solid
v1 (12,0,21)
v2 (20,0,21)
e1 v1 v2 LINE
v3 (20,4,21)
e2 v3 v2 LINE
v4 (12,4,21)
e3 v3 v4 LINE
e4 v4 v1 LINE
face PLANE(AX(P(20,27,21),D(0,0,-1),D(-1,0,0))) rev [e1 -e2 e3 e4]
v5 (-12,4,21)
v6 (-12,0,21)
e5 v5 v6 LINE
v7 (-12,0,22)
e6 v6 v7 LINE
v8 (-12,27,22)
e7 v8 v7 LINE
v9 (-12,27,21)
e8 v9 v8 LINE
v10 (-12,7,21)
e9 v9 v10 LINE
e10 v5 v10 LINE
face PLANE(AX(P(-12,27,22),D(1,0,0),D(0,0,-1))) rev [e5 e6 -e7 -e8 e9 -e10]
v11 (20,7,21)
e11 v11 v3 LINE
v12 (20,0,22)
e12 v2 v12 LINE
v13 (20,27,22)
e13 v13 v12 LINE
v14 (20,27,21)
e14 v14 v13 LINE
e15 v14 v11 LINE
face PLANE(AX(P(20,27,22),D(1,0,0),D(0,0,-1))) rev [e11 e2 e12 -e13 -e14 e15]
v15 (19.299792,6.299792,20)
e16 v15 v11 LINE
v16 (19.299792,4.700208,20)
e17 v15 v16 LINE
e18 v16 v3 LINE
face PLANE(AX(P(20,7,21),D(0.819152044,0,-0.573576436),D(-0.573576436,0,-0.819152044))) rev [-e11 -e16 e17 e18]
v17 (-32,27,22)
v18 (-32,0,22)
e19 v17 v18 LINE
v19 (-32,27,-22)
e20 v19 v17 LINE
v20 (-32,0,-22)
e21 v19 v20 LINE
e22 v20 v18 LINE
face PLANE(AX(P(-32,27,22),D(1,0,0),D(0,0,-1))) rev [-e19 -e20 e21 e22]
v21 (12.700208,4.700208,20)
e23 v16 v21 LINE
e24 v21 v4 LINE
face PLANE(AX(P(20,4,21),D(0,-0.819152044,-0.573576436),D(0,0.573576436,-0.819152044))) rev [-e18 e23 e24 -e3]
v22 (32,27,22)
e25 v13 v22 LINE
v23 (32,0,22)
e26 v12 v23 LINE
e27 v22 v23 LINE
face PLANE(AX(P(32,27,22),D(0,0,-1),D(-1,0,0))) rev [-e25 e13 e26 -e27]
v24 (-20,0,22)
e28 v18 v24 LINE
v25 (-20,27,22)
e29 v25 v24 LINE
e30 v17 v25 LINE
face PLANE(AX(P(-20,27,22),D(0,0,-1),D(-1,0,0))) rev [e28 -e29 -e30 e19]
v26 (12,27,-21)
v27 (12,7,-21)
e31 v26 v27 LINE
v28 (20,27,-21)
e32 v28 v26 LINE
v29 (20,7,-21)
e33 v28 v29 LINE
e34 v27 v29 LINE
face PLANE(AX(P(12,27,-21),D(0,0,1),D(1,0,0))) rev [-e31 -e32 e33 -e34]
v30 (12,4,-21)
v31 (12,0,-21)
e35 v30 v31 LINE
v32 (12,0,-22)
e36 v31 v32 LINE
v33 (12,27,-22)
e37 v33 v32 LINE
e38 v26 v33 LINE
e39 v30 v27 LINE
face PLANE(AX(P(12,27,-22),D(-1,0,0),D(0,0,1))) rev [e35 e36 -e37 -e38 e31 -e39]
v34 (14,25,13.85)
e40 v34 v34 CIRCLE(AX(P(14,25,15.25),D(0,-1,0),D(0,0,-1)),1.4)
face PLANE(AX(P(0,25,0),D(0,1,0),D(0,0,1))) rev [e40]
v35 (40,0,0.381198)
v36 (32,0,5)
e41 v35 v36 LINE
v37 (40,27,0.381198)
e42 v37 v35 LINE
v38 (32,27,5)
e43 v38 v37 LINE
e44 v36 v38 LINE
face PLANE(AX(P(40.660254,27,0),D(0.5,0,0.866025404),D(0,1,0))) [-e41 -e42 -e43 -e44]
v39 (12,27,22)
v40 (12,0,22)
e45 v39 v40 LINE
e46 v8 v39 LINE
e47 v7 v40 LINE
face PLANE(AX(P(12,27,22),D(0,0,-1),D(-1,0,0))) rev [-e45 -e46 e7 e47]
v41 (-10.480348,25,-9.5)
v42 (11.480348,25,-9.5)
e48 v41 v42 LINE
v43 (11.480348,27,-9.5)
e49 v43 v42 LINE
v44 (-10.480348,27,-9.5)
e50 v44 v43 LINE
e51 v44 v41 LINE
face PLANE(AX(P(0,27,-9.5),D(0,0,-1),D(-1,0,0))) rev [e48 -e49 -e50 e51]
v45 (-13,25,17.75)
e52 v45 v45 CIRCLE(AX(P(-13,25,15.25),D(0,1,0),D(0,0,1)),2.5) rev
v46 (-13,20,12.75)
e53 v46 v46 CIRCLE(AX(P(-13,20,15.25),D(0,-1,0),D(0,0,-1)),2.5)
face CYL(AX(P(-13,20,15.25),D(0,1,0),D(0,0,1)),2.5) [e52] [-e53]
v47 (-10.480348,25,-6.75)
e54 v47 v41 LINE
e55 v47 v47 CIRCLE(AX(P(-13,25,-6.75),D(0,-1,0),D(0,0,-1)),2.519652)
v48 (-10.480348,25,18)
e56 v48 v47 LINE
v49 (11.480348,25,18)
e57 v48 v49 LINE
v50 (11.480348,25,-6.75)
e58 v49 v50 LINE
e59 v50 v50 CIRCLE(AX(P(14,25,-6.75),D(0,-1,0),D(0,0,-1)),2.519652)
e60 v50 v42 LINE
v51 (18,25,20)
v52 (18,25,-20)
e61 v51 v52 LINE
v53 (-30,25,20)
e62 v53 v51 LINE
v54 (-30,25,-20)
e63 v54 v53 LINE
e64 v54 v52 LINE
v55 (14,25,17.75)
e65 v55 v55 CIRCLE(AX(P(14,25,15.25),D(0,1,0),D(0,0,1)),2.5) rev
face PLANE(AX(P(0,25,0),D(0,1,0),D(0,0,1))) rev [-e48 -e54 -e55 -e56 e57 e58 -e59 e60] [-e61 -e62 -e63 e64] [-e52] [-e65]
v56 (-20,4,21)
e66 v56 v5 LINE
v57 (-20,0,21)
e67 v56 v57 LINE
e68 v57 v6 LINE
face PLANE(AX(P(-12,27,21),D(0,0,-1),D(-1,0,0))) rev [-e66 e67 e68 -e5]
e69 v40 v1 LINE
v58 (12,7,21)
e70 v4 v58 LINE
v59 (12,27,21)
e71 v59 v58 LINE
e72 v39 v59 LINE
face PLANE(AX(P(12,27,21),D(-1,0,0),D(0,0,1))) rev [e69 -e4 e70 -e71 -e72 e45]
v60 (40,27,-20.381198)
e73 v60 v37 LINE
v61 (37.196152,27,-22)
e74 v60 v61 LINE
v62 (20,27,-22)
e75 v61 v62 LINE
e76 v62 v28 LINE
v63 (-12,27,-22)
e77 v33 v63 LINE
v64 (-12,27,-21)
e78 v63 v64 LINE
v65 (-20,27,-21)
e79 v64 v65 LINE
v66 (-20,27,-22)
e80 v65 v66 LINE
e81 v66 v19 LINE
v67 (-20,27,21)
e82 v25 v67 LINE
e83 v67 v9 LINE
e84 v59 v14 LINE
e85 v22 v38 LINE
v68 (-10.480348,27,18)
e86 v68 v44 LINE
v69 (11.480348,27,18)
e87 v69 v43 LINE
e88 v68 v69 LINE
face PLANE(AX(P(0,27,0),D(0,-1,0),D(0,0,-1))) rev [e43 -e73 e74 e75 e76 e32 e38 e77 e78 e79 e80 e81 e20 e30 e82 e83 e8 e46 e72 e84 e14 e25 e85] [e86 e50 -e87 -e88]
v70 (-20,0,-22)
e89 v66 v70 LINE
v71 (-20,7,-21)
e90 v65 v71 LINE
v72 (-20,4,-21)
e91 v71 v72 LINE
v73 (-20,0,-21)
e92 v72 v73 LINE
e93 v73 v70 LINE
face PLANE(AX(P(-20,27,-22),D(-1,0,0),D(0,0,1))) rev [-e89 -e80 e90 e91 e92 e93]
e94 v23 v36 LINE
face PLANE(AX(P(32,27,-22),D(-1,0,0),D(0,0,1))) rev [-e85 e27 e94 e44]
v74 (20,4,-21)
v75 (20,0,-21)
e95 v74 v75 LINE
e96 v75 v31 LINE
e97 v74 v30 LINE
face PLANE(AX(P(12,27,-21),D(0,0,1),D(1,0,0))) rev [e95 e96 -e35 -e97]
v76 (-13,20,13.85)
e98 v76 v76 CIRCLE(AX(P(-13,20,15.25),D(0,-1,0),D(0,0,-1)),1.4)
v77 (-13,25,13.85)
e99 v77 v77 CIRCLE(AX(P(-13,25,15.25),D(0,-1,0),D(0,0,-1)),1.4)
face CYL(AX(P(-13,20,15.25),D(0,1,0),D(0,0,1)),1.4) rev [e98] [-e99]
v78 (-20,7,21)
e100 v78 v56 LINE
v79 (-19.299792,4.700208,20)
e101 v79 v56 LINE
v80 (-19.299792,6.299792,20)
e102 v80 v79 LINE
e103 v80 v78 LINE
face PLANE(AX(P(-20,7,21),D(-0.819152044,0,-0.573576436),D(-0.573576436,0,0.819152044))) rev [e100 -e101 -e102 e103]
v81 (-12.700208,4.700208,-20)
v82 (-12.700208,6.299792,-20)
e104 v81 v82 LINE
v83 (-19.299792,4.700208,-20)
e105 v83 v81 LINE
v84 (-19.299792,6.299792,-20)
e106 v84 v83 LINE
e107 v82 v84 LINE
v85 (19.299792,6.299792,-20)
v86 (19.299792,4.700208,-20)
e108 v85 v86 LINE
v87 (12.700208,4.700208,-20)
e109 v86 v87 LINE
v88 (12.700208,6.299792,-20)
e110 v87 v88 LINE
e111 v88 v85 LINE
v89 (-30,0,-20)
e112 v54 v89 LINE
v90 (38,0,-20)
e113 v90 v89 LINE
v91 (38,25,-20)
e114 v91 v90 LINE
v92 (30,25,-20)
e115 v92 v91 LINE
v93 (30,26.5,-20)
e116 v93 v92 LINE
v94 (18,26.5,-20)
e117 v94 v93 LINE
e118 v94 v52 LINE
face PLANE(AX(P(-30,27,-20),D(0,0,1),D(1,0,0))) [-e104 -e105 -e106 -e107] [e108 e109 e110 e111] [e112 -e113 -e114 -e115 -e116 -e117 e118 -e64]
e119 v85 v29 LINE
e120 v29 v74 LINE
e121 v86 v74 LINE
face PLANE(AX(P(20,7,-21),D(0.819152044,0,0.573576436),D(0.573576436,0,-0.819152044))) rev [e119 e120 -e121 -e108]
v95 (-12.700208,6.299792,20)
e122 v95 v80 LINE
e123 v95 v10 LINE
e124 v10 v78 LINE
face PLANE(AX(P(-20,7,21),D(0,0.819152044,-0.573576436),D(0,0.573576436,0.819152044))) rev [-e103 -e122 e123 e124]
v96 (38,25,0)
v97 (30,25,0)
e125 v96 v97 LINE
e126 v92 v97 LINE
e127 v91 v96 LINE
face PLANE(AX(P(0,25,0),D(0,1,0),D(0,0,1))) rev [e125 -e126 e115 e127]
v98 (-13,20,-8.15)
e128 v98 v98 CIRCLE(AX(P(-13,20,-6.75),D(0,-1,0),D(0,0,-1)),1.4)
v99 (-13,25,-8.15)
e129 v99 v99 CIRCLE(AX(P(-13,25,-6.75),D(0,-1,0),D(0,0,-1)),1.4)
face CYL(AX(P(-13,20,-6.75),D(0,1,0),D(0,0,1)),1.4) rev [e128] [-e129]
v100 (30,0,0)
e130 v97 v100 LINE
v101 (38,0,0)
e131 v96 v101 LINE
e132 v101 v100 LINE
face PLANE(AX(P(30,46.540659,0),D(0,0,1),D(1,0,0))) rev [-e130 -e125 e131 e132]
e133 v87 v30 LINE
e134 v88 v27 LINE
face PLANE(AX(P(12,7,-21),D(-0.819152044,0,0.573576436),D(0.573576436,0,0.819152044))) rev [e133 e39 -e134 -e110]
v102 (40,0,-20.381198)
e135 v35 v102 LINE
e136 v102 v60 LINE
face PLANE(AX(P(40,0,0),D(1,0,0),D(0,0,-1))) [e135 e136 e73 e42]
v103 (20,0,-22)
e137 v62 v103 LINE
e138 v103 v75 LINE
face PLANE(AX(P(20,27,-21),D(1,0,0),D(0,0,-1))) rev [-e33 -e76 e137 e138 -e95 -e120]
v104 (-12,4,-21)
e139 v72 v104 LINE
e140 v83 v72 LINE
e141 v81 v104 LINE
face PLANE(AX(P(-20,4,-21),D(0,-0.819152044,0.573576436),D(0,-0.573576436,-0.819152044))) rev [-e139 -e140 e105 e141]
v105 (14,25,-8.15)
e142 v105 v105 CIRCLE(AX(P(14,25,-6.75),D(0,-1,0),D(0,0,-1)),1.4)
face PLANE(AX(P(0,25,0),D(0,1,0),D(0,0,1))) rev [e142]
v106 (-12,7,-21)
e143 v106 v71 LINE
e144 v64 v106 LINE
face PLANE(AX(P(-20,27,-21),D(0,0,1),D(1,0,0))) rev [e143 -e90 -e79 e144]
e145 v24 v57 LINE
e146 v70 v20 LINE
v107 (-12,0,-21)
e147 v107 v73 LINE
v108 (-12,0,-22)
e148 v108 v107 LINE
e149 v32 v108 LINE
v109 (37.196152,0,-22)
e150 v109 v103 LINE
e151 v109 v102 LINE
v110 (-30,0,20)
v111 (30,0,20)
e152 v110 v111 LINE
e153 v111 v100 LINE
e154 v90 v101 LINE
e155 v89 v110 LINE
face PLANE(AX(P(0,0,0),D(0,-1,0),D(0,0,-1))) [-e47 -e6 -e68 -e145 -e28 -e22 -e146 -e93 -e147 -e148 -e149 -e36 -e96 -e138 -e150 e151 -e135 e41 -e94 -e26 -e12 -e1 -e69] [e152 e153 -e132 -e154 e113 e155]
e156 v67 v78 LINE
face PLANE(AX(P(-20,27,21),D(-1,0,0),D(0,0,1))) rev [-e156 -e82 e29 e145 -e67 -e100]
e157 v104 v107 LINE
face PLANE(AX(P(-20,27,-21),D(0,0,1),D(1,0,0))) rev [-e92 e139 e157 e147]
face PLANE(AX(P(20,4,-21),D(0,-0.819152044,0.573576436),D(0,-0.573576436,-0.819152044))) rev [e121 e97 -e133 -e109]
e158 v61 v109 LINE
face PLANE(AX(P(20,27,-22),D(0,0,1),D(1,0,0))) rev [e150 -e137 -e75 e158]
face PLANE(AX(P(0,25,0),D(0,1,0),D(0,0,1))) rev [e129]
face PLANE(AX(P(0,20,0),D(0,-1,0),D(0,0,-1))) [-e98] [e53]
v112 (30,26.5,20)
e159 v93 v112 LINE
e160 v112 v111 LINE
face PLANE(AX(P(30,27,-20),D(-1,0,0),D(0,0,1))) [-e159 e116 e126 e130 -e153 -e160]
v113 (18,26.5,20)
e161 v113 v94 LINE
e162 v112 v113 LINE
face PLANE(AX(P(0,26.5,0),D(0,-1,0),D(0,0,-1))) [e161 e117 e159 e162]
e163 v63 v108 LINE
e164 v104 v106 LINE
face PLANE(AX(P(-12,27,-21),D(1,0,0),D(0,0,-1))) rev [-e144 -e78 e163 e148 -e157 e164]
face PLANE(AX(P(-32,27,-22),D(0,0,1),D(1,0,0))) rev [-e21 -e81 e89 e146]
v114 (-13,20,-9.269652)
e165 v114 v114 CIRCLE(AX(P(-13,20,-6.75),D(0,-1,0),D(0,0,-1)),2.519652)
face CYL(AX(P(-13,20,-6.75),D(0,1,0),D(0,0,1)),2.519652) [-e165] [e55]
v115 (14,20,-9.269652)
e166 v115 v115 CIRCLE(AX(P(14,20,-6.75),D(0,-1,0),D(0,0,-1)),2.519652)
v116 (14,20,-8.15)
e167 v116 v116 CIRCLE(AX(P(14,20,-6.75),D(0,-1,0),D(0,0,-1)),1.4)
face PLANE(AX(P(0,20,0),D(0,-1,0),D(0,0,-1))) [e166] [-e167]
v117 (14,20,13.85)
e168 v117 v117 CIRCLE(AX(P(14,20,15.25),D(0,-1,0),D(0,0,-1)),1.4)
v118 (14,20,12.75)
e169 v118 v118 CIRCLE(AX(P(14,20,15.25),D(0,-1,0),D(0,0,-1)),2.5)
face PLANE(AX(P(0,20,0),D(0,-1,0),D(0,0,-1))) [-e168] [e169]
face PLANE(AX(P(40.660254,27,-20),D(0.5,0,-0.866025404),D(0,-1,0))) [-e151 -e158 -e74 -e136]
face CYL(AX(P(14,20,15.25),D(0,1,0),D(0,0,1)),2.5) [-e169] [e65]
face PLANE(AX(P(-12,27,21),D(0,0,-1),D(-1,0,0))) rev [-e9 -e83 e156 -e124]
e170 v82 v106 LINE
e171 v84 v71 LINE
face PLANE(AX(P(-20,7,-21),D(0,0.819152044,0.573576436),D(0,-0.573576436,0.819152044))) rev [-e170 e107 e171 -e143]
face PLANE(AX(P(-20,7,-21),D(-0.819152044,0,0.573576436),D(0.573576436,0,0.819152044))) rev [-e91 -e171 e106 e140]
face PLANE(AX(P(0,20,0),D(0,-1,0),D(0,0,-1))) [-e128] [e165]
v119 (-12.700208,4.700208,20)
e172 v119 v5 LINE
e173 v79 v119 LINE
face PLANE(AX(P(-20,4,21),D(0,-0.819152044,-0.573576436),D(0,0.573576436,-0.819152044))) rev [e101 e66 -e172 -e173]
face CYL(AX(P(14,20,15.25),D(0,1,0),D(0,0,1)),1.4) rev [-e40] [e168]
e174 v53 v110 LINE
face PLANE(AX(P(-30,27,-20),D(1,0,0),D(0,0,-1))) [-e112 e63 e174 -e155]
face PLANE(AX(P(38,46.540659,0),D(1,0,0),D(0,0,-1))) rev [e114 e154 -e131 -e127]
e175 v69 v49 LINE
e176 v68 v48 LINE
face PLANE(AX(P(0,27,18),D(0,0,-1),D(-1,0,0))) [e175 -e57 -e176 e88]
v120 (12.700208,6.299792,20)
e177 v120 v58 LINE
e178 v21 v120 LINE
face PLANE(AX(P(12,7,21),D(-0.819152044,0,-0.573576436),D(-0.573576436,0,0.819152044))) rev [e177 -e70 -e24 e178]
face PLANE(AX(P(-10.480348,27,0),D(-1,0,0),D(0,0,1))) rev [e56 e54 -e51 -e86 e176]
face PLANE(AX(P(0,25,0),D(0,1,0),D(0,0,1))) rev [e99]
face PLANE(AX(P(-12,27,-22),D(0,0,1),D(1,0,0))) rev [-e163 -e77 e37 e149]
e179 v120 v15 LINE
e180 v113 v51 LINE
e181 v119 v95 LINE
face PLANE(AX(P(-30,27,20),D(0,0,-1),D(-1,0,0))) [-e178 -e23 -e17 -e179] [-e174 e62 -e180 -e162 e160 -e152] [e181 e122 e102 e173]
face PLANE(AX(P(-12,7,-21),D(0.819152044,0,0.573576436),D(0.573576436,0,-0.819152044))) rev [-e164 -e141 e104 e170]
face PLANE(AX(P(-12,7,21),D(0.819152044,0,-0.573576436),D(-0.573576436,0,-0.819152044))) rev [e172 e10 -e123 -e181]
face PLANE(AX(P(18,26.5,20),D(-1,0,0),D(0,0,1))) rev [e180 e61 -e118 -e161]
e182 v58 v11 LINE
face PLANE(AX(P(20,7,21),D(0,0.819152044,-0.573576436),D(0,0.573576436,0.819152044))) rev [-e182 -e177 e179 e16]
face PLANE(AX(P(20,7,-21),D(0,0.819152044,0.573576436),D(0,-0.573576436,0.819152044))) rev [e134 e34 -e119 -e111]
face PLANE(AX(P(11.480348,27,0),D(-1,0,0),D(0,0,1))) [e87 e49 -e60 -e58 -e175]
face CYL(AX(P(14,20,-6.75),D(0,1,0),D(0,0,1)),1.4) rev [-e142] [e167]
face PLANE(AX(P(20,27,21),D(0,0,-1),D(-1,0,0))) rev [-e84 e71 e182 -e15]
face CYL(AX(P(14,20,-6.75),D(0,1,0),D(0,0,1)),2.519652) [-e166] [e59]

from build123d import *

# Parameters (mm, degrees)
SKETCH1_W               = 60
SKETCH1_H               = 40
BOSS_EXTRUDE1_DEPTH     = 27
SKETCH2_W               = 8
SKETCH2_H               = 3
CUT_EXTRUDE1_DEPTH      = 1
CUT_EXTRUDE1_DRAFT      = -35
MIRROR1_COPY_1_SKETCH_W = 8
MIRROR1_COPY_1_SKETCH_H = 3
MIRROR1_COPY_1_DEPTH    = 1
MIRROR1_COPY_1_DRAFT    = -35
MIRROR2_COPY_1_SKETCH_W = 8
MIRROR2_COPY_1_SKETCH_H = 3
MIRROR2_COPY_1_DEPTH    = 1
MIRROR2_COPY_1_DRAFT    = -35
MIRROR2_COPY_2_SKETCH_W = 8
MIRROR2_COPY_2_SKETCH_H = 3
MIRROR2_COPY_2_DEPTH    = 1
MIRROR2_COPY_2_DRAFT    = -35
BOSS_EXTRUDE2_START     = 27
SKETCH1_3_W             = 60
SKETCH1_3_H             = 40
BOSS_EXTRUDE2_DEPTH     = 2
SKETCH3_W               = 21.960696684
SKETCH3_H               = 27.5
CUT_EXTRUDE2_DEPTH      = 2
SKETCH3_3_R             = 2.5
SKETCH3_3_R_2           = 1.4
SKETCH3_3_R_3           = 2.519651658
BOSS_EXTRUDE3_DEPTH     = 5
SKETCH4_W               = 20
SKETCH4_H               = 27
BOSS_EXTRUDE4_DEPTH     = 8
CHAMFER1_SIZE           = 5
CHAMFER1_SIZE_2         = 8.660254038
SKETCH5_W               = 8
SKETCH5_H               = 20
CUT_EXTRUDE3_DEPTH      = 25
SKETCH6_W               = 12
SKETCH6_H               = 40
CUT_EXTRUDE5_DEPTH      = 1.5


with BuildPart() as part:
    # Sketch1 → Boss-Extrude1 (new body)
    with BuildSketch(Plane(origin=(0, 0, 0), x_dir=(1, 0, 0), z_dir=(0, 1, 0))):
        Polygon((-32, 22), (-20, 22), (-20, 21), (-12, 21), (-12, 22), (12, 22), (12, 21), (20, 21), (20, 22), (32, 22), (32, -22), (20, -22), (20, -21), (12, -21), (12, -22), (-12, -22), (-12, -21), (-20, -21), (-20, -22), (-32, -22), align=None)
        Rectangle(SKETCH1_W, SKETCH1_H, mode=Mode.SUBTRACT)
    extrude(amount=BOSS_EXTRUDE1_DEPTH)


with BuildPart() as cut_extrude1_tool:
    # Sketch2 → Cut-Extrude1 (with draft: the straight prism first)
    with BuildSketch(Plane.XY.offset(21)):
        with Locations((-16, 5.5)):
            Rectangle(SKETCH2_W, SKETCH2_H)
    extrude(amount=-CUT_EXTRUDE1_DEPTH)
    # Cut-Extrude1: the draft: its side faces are tilted about the plane it starts from
    cut_extrude1_sides = [cut_extrude1_tool.faces().sort_by_distance(p)[0] for p in [
        (-20, 5.5, 20.5),
        (-16, 4, 20.5),
        (-12, 5.5, 20.5),
        (-16, 7, 20.5),
    ]]
    draft(cut_extrude1_sides, Plane.XY.offset(21), CUT_EXTRUDE1_DRAFT)


with BuildPart() as part_1:
    add(part.part)

    # Cut-Extrude1: cut by cut_extrude1_tool
    add(cut_extrude1_tool.part, mode=Mode.SUBTRACT)


with BuildPart() as mirror1_copy_1_tool:
    # Mirror1 copy 1 sketch → Mirror1 copy 1 (with draft: the straight prism first)
    with BuildSketch(Plane(origin=(0, 0, 21), x_dir=(-1, 0, 0), z_dir=(0, 0, 1))):
        with Locations((-16, -5.5)):
            Rectangle(MIRROR1_COPY_1_SKETCH_W, MIRROR1_COPY_1_SKETCH_H)
    extrude(amount=-MIRROR1_COPY_1_DEPTH)
    # Mirror1 copy 1: the draft: its side faces are tilted about the plane it starts from
    mirror1_copy_1_sides = [mirror1_copy_1_tool.faces().sort_by_distance(p)[0] for p in [
        (20, 5.5, 20.5),
        (16, 4, 20.5),
        (12, 5.5, 20.5),
        (16, 7, 20.5),
    ]]
    draft(mirror1_copy_1_sides, Plane(origin=(0, 0, 21), x_dir=(-1, 0, 0), z_dir=(0, 0, 1)), MIRROR1_COPY_1_DRAFT)


with BuildPart() as part_2:
    add(part_1.part)

    # Mirror1 copy 1: cut by mirror1_copy_1_tool
    add(mirror1_copy_1_tool.part, mode=Mode.SUBTRACT)


with BuildPart() as mirror2_copy_1_tool:
    # Mirror2 copy 1 sketch → Mirror2 copy 1 (with draft: the straight prism first)
    with BuildSketch(Plane(origin=(0, 0, -21), x_dir=(1, 0, 0), z_dir=(0, 0, -1))):
        with Locations((-16, -5.5)):
            Rectangle(MIRROR2_COPY_1_SKETCH_W, MIRROR2_COPY_1_SKETCH_H)
    extrude(amount=-MIRROR2_COPY_1_DEPTH)
    # Mirror2 copy 1: the draft: its side faces are tilted about the plane it starts from
    mirror2_copy_1_sides = [mirror2_copy_1_tool.faces().sort_by_distance(p)[0] for p in [
        (-20, 5.5, -20.5),
        (-16, 4, -20.5),
        (-12, 5.5, -20.5),
        (-16, 7, -20.5),
    ]]
    draft(mirror2_copy_1_sides, Plane(origin=(0, 0, -21), x_dir=(1, 0, 0), z_dir=(0, 0, -1)), MIRROR2_COPY_1_DRAFT)


with BuildPart() as part_3:
    add(part_2.part)

    # Mirror2 copy 1: cut by mirror2_copy_1_tool
    add(mirror2_copy_1_tool.part, mode=Mode.SUBTRACT)


with BuildPart() as mirror2_copy_2_tool:
    # Mirror2 copy 2 sketch → Mirror2 copy 2 (with draft: the straight prism first)
    with BuildSketch(Plane(origin=(0, 0, -21), x_dir=(-1, 0, 0), z_dir=(0, 0, -1))):
        with Locations((-16, 5.5)):
            Rectangle(MIRROR2_COPY_2_SKETCH_W, MIRROR2_COPY_2_SKETCH_H)
    extrude(amount=-MIRROR2_COPY_2_DEPTH)
    # Mirror2 copy 2: the draft: its side faces are tilted about the plane it starts from
    mirror2_copy_2_sides = [mirror2_copy_2_tool.faces().sort_by_distance(p)[0] for p in [
        (20, 5.5, -20.5),
        (16, 4, -20.5),
        (12, 5.5, -20.5),
        (16, 7, -20.5),
    ]]
    draft(mirror2_copy_2_sides, Plane(origin=(0, 0, -21), x_dir=(-1, 0, 0), z_dir=(0, 0, -1)), MIRROR2_COPY_2_DRAFT)


with BuildPart() as part_4:
    add(part_3.part)

    # Mirror2 copy 2: cut by mirror2_copy_2_tool
    add(mirror2_copy_2_tool.part, mode=Mode.SUBTRACT)

    # Sketch1<3> → Boss-Extrude2 (add)
    with BuildSketch(Plane(origin=(0, 0, 0), x_dir=(1, 0, 0), z_dir=(0, 1, 0)).offset(BOSS_EXTRUDE2_START)):
        Rectangle(SKETCH1_3_W, SKETCH1_3_H)
    extrude(amount=-BOSS_EXTRUDE2_DEPTH)

    # Sketch3 → Cut-Extrude2 (cut)
    with BuildSketch(Plane.XZ.offset(-25)):
        with Locations((0.5, 4.25)):
            Rectangle(SKETCH3_W, SKETCH3_H)
    extrude(amount=-CUT_EXTRUDE2_DEPTH, mode=Mode.SUBTRACT)

    # Sketch3<3> → Boss-Extrude3 (add)
    # profile 1 of 4: a face of its own
    with BuildSketch(Plane.XZ.offset(-25)):
        with Locations(Location((-13, 15.25, 0), (0, 0, 90))):
            Circle(SKETCH3_3_R)
        with Locations(Location((-13, 15.25, 0), (0, 0, 270))):
            Circle(SKETCH3_3_R_2, mode=Mode.SUBTRACT)
    # profile 2 of 4: a face of its own
    with BuildSketch(Plane.XZ.offset(-25)):
        with Locations((-13, -6.75)):
            Circle(SKETCH3_3_R_3)
        with Locations(Location((-13, -6.75, 0), (0, 0, 270))):
            Circle(SKETCH3_3_R_2, mode=Mode.SUBTRACT)
    # profile 3 of 4: a face of its own
    with BuildSketch(Plane.XZ.offset(-25)):
        with Locations(Location((14, -6.75, 0), (0, 0, 180))):
            Circle(SKETCH3_3_R_3)
        with Locations(Location((14, -6.75, 0), (0, 0, 270))):
            Circle(SKETCH3_3_R_2, mode=Mode.SUBTRACT)
    # profile 4 of 4: a face of its own
    with BuildSketch(Plane.XZ.offset(-25)):
        with Locations(Location((14, 15.25, 0), (0, 0, 90))):
            Circle(SKETCH3_3_R)
        with Locations(Location((14, 15.25, 0), (0, 0, 270))):
            Circle(SKETCH3_3_R_2, mode=Mode.SUBTRACT)
    extrude(amount=BOSS_EXTRUDE3_DEPTH)

    # Sketch4 → Boss-Extrude4 (add)
    with BuildSketch(Plane(origin=(32, 0, 0), x_dir=(0, 0, -1), z_dir=(1, 0, 0))):
        with Locations((10, 13.5)):
            Rectangle(SKETCH4_W, SKETCH4_H)
    extrude(amount=BOSS_EXTRUDE4_DEPTH)

    # Chamfer1
    # the kernel refuses this chamfer: 8.660254038, 5 mm, written as the material it adds along each edge
    with BuildSketch(Plane(origin=(32, 27, -20), x_dir=(-0.05789386240267251, 0, -0.9983227437537924), z_dir=(0, -1, 0))) as chamfer1_piece_1_section:
        Polygon((CHAMFER1_SIZE * 0.998322743754, CHAMFER1_SIZE * 0.0578938624027), (-CHAMFER1_SIZE_2 * 0.0578938624016, CHAMFER1_SIZE_2 * 0.998322743736), (0, 0), align=None)
    chamfer1_piece_1 = extrude(amount=27, mode=Mode.PRIVATE)
    chamfer1_piece_1 = split(chamfer1_piece_1, bisect_by=Plane(origin=(35.513912711, 13.5, -22), z_dir=(0, 0, 1)), keep=Keep.TOP, mode=Mode.PRIVATE)
    chamfer1_piece_1 = split(chamfer1_piece_1, bisect_by=Plane(origin=(40, 13.5, -20.824917772), z_dir=(-1, 0, 0)), keep=Keep.TOP, mode=Mode.PRIVATE)
    add(chamfer1_piece_1)
    with BuildSketch(Plane(origin=(32, 0, 0), x_dir=(-0.05789386240267113, 0, 0.9983227437537926), z_dir=(0, 1, 0))) as chamfer1_piece_2_section:
        Polygon((CHAMFER1_SIZE * 0.998322743754, CHAMFER1_SIZE * 0.0578938624027), (-CHAMFER1_SIZE_2 * 0.0578938624016, CHAMFER1_SIZE_2 * 0.998322743736), (0, 0), align=None)
    chamfer1_piece_2 = extrude(amount=27, mode=Mode.PRIVATE)
    chamfer1_piece_2 = split(chamfer1_piece_2, bisect_by=Plane(origin=(40, 13.5, 1.631661659), z_dir=(-1, 0, 0)), keep=Keep.TOP, mode=Mode.PRIVATE)
    add(chamfer1_piece_2)

    # Sketch5 → Cut-Extrude3 (cut)
    with BuildSketch(Plane.XZ):
        with Locations((34, -10)):
            Rectangle(SKETCH5_W, SKETCH5_H)
    extrude(amount=-CUT_EXTRUDE3_DEPTH, mode=Mode.SUBTRACT)

    # Sketch6 → Cut-Extrude5 (cut)
    with BuildSketch(Plane.XZ.offset(-25)):
        with Locations((24, 0)):
            Rectangle(SKETCH6_W, SKETCH6_H)
    extrude(amount=-CUT_EXTRUDE5_DEPTH, mode=Mode.SUBTRACT)


solid = part_4.part
